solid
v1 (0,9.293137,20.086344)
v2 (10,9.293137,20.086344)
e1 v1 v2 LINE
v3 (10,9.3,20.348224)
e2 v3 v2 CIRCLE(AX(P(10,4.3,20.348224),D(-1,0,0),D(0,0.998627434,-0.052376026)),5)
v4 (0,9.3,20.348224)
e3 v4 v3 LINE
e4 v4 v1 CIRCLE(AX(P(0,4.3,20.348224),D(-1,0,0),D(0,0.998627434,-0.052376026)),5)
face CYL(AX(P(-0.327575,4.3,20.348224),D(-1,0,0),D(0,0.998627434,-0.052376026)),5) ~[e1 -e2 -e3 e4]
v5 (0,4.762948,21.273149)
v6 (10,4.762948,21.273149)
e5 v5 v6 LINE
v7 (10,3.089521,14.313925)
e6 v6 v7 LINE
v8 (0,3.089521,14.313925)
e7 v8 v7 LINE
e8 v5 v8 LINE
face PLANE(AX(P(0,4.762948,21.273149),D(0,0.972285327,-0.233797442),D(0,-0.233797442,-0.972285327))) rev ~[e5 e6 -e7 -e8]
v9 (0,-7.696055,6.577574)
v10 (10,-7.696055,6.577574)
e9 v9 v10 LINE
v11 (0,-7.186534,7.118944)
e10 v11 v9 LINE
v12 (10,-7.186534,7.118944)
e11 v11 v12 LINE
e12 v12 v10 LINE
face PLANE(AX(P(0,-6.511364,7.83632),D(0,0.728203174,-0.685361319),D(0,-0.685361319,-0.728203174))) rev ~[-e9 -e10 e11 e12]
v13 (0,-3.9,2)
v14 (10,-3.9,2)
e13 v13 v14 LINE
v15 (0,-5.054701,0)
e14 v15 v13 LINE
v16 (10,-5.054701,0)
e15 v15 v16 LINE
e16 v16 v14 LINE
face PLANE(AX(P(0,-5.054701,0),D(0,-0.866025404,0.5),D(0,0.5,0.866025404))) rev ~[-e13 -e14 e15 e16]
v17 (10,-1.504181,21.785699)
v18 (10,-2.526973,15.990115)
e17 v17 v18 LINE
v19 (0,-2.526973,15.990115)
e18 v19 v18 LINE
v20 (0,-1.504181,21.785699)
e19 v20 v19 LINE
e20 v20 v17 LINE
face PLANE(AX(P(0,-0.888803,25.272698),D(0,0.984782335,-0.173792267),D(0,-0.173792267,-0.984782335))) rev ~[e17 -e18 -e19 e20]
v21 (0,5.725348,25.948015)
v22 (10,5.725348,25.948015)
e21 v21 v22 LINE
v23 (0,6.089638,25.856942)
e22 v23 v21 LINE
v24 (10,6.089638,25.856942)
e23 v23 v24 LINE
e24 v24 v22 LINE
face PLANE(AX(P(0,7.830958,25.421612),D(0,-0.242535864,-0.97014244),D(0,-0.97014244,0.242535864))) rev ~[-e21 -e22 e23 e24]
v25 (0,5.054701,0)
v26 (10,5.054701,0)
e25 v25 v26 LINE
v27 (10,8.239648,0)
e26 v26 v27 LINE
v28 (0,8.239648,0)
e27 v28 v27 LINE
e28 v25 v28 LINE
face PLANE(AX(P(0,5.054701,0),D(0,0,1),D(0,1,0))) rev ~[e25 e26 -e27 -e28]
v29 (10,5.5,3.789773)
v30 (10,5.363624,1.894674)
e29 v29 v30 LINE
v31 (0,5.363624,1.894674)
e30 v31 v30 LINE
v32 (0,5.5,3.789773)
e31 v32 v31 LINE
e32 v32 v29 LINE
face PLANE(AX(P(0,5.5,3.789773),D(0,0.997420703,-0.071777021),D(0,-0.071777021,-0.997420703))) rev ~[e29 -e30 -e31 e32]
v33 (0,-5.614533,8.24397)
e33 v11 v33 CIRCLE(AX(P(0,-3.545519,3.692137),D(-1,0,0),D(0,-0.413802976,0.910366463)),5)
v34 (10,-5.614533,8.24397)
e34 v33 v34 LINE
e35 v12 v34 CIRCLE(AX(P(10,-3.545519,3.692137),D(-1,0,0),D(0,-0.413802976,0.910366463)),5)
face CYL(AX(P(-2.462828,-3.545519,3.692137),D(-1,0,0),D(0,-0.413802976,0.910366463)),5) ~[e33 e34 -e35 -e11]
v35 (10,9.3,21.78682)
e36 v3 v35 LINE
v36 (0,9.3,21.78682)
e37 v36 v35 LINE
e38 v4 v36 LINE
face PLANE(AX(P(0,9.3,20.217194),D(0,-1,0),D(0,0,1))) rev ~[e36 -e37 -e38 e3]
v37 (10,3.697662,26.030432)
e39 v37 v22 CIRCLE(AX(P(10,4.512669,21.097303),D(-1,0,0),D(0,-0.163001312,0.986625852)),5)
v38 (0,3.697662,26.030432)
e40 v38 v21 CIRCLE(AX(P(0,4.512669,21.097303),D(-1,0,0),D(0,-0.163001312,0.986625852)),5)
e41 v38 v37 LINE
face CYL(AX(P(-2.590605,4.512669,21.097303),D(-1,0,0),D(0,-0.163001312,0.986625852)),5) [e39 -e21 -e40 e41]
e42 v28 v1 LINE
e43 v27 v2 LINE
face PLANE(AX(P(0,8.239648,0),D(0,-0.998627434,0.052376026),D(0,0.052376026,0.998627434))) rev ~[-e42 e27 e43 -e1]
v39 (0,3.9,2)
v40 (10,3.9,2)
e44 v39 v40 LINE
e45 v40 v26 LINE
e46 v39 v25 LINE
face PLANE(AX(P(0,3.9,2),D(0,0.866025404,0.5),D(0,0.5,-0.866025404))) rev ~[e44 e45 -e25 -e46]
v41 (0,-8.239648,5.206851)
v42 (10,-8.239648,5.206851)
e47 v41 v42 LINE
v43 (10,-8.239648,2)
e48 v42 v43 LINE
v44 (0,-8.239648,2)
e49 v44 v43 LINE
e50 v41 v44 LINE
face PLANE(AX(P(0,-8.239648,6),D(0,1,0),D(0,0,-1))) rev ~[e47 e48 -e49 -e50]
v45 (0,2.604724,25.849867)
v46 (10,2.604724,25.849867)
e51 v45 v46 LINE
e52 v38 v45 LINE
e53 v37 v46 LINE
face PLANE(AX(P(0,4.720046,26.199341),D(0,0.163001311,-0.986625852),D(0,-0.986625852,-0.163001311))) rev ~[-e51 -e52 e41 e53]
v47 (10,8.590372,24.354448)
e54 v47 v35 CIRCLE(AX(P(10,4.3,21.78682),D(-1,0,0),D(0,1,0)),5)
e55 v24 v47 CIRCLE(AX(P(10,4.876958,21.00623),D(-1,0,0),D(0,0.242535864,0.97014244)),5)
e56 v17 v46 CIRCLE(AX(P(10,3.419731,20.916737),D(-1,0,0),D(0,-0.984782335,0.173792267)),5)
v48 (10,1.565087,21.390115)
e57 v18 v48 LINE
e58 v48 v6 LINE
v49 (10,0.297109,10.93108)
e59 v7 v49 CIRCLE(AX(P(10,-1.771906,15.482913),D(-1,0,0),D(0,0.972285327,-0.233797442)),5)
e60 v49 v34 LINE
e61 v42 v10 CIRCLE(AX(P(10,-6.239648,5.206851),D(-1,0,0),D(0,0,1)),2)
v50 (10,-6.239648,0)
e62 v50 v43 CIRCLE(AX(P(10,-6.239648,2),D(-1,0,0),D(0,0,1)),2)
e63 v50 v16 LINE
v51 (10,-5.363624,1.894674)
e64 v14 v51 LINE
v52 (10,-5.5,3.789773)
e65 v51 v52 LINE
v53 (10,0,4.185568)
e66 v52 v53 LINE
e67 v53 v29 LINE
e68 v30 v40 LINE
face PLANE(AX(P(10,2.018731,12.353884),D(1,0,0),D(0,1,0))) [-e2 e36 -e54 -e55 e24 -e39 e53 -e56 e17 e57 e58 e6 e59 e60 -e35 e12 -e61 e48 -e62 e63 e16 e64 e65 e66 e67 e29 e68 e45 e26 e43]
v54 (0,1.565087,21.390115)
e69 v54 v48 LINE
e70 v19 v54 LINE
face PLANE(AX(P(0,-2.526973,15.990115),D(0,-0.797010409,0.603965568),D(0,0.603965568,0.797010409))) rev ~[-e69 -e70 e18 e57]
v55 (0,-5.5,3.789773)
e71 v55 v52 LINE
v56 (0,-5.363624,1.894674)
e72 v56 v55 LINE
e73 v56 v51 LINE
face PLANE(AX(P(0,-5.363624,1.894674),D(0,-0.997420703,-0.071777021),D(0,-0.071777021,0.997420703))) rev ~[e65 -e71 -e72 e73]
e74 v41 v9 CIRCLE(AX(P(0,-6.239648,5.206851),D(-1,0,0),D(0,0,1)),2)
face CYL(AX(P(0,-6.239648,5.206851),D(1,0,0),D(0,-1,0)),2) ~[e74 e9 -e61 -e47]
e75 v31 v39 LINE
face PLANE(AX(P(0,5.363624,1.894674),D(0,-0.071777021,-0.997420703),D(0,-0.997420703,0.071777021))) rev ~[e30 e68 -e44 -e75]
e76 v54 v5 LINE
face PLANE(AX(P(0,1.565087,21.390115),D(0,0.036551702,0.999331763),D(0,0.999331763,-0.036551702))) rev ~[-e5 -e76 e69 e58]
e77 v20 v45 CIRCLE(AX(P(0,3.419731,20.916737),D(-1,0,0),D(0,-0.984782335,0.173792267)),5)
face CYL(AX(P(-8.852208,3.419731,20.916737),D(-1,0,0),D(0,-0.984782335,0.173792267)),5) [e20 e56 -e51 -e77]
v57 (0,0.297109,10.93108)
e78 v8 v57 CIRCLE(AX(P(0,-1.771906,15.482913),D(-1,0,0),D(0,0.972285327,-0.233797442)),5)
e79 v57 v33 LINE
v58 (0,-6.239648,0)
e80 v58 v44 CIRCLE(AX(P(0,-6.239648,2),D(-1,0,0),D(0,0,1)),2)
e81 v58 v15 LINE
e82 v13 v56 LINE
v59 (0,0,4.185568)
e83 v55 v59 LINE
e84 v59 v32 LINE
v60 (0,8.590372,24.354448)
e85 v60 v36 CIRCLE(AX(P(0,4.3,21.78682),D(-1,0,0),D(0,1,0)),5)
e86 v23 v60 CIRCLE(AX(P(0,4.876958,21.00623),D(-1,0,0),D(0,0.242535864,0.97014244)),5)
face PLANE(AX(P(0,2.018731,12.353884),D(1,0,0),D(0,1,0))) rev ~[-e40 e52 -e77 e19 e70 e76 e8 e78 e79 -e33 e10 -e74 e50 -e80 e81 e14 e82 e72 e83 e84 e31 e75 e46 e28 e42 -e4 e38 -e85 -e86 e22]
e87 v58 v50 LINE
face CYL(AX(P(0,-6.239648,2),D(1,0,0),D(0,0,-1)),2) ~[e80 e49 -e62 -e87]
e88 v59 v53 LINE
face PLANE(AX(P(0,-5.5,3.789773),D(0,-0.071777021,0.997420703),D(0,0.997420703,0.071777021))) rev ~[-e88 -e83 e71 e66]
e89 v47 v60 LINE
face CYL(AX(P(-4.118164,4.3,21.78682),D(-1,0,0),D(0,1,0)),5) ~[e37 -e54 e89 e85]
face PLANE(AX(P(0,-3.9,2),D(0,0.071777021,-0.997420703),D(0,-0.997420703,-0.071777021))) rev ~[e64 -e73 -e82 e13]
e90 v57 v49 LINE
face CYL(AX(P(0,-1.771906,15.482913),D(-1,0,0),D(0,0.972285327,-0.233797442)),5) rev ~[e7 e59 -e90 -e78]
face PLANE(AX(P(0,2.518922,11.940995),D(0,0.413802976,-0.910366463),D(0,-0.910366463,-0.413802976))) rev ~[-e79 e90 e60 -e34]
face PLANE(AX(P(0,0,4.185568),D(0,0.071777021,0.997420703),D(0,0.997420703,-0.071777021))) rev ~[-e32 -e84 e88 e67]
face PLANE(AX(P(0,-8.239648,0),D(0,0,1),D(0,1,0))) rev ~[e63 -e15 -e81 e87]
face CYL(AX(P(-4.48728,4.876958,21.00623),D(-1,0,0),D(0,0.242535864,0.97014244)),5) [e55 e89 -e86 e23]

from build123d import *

# Parameters (mm, degrees)
F2_DEPTH     = 10
F3_T1_DEPTH  = 10
F3_T3_DEPTH  = 10.6551499426
F3_T5_DEPTH  = 18.2363272352
F3_T7_DEPTH  = 18.9745597366
F3_T9_DEPTH  = 15.1812109951
F3_T11_DEPTH = 27.7044164166
F3_T13_DEPTH = 14.9256552594
F4_R         = 2


# Not quite as in the source:
# - a fillet or chamfer that OpenCascade refuses, or shapes differently, is made with other operations: its cross-section is extruded or revolved along the edge and cut away or added


with BuildPart() as f2:
    # F1 (on Right) → F2 (new body)
    with BuildSketch(Plane.YZ):
        Polygon((-5.0547005384, 0), (-3.9, 2), (-5.3636236598, 1.894673786), (-5.5, 3.7897731222), (0, 4.18556761), (5.5, 3.7897731222), (5.3636236598, 1.894673786), (3.9, 2), (5.0547005384, 0), (8.2396483049, 0), (9.3, 20.2171942833), (9.3, 23.4340857714), (7.8309578478, 25.4216119647), (4.720045685, 26.1993408203), (-0.8888025768, 25.2726981416), (-2.5269729085, 15.9901147708), (1.5650866553, 21.3901147708), (4.7629482978, 21.2731493252), (2.5189220905, 11.9409952313), (-6.5113636665, 7.8363195062), (-8.2396483049, 6), (-8.2396483049, 0), align=None)
    extrude(amount=F2_DEPTH)

    # F3: fillet of radius 5 on 7 edges, made by hand

    # F3_s2 → F3_t1 (join)
    with BuildSketch(Plane.YZ):
        with BuildLine():
            ThreePointArc((3.0895210417, 14.313925334), (2.0840852214, 12.299936757), (0.2971092897, 10.9310802281))
            Line((0.2971092897, 10.9310802281), (2.5189220905, 11.9409952313))
            Line((2.5189220905, 11.9409952313), (3.0895210417, 14.313925334))
        make_face()
    extrude(amount=F3_T1_DEPTH)

    # F3_s4 → F3_t3 (cut)
    with BuildSketch(Plane.YZ.offset(-0.3275749713)):
        with BuildLine():
            ThreePointArc((9.2931371699, 20.0863441421), (9.298283998, 20.2172392528), (9.3, 20.3482242718))
            Line((9.3, 20.3482242718), (9.3, 20.2171942833))
            Line((9.3, 20.2171942833), (9.2931371699, 20.0863441421))
        make_face()
    extrude(amount=F3_T3_DEPTH, mode=Mode.SUBTRACT)

    # F3_s6 → F3_t5 (cut)
    with BuildSketch(Plane.YZ.offset(-4.1181636176)):
        with BuildLine():
            ThreePointArc((9.3, 21.7868203244), (9.0489155839, 23.3513652349), (8.3208796893, 24.7587770072))
            Line((8.3208796893, 24.7587770072), (9.3, 23.4340857714))
            Line((9.3, 23.4340857714), (9.3, 21.7868203244))
        make_face()
    extrude(amount=F3_T5_DEPTH, mode=Mode.SUBTRACT)

    # F3_s8 → F3_t7 (cut)
    with BuildSketch(Plane.YZ.offset(-4.4872798683)):
        with BuildLine():
            ThreePointArc((6.089637591, 25.856942485), (7.6572398301, 25.1619533788), (8.8978379592, 23.9781869661))
            Line((8.8978379592, 23.9781869661), (7.8309578478, 25.4216119647))
            Line((7.8309578478, 25.4216119647), (6.089637591, 25.856942485))
        make_face()
    extrude(amount=F3_T7_DEPTH, mode=Mode.SUBTRACT)

    # F3_s10 → F3_t9 (cut)
    with BuildSketch(Plane.YZ.offset(-2.5906054975)):
        with BuildLine():
            ThreePointArc((3.6976623422, 26.0304319828), (4.715730589, 26.0931776147), (5.7253482208, 25.948014923))
            Line((5.7253482208, 25.948014923), (4.720045685, 26.1993408203))
            Line((4.720045685, 26.1993408203), (3.6976623422, 26.0304319828))
        make_face()
    extrude(amount=F3_T9_DEPTH, mode=Mode.SUBTRACT)

    # F3_s12 → F3_t11 (cut)
    with BuildSketch(Plane.YZ.offset(-8.8522082083)):
        with BuildLine():
            ThreePointArc((-1.5041807088, 21.7856988327), (-0.0963977073, 24.4715707073), (2.6047244105, 25.8498667607))
            Line((2.6047244105, 25.8498667607), (-0.8888025768, 25.2726981416))
            Line((-0.8888025768, 25.2726981416), (-1.5041807088, 21.7856988327))
        make_face()
    extrude(amount=F3_T11_DEPTH, mode=Mode.SUBTRACT)

    # F3_s14 → F3_t13 (cut)
    with BuildSketch(Plane.YZ.offset(-2.4628276297)):
        with BuildLine():
            ThreePointArc((-5.6145333952, 8.2439696673), (-6.4554211776, 7.7581509396), (-7.1865343837, 7.1189439476))
            Line((-7.1865343837, 7.1189439476), (-6.5113636665, 7.8363195062))
            Line((-6.5113636665, 7.8363195062), (-5.6145333952, 8.2439696673))
        make_face()
    extrude(amount=F3_T13_DEPTH, mode=Mode.SUBTRACT)

    # F4
    f4_edges = [f2.edges().sort_by_distance(p)[0] for p in [
        (5, -8.239648, 0),
        (5, -8.239648, 6),
    ]]
    fillet(f4_edges, radius=F4_R)


solid = f2.part
